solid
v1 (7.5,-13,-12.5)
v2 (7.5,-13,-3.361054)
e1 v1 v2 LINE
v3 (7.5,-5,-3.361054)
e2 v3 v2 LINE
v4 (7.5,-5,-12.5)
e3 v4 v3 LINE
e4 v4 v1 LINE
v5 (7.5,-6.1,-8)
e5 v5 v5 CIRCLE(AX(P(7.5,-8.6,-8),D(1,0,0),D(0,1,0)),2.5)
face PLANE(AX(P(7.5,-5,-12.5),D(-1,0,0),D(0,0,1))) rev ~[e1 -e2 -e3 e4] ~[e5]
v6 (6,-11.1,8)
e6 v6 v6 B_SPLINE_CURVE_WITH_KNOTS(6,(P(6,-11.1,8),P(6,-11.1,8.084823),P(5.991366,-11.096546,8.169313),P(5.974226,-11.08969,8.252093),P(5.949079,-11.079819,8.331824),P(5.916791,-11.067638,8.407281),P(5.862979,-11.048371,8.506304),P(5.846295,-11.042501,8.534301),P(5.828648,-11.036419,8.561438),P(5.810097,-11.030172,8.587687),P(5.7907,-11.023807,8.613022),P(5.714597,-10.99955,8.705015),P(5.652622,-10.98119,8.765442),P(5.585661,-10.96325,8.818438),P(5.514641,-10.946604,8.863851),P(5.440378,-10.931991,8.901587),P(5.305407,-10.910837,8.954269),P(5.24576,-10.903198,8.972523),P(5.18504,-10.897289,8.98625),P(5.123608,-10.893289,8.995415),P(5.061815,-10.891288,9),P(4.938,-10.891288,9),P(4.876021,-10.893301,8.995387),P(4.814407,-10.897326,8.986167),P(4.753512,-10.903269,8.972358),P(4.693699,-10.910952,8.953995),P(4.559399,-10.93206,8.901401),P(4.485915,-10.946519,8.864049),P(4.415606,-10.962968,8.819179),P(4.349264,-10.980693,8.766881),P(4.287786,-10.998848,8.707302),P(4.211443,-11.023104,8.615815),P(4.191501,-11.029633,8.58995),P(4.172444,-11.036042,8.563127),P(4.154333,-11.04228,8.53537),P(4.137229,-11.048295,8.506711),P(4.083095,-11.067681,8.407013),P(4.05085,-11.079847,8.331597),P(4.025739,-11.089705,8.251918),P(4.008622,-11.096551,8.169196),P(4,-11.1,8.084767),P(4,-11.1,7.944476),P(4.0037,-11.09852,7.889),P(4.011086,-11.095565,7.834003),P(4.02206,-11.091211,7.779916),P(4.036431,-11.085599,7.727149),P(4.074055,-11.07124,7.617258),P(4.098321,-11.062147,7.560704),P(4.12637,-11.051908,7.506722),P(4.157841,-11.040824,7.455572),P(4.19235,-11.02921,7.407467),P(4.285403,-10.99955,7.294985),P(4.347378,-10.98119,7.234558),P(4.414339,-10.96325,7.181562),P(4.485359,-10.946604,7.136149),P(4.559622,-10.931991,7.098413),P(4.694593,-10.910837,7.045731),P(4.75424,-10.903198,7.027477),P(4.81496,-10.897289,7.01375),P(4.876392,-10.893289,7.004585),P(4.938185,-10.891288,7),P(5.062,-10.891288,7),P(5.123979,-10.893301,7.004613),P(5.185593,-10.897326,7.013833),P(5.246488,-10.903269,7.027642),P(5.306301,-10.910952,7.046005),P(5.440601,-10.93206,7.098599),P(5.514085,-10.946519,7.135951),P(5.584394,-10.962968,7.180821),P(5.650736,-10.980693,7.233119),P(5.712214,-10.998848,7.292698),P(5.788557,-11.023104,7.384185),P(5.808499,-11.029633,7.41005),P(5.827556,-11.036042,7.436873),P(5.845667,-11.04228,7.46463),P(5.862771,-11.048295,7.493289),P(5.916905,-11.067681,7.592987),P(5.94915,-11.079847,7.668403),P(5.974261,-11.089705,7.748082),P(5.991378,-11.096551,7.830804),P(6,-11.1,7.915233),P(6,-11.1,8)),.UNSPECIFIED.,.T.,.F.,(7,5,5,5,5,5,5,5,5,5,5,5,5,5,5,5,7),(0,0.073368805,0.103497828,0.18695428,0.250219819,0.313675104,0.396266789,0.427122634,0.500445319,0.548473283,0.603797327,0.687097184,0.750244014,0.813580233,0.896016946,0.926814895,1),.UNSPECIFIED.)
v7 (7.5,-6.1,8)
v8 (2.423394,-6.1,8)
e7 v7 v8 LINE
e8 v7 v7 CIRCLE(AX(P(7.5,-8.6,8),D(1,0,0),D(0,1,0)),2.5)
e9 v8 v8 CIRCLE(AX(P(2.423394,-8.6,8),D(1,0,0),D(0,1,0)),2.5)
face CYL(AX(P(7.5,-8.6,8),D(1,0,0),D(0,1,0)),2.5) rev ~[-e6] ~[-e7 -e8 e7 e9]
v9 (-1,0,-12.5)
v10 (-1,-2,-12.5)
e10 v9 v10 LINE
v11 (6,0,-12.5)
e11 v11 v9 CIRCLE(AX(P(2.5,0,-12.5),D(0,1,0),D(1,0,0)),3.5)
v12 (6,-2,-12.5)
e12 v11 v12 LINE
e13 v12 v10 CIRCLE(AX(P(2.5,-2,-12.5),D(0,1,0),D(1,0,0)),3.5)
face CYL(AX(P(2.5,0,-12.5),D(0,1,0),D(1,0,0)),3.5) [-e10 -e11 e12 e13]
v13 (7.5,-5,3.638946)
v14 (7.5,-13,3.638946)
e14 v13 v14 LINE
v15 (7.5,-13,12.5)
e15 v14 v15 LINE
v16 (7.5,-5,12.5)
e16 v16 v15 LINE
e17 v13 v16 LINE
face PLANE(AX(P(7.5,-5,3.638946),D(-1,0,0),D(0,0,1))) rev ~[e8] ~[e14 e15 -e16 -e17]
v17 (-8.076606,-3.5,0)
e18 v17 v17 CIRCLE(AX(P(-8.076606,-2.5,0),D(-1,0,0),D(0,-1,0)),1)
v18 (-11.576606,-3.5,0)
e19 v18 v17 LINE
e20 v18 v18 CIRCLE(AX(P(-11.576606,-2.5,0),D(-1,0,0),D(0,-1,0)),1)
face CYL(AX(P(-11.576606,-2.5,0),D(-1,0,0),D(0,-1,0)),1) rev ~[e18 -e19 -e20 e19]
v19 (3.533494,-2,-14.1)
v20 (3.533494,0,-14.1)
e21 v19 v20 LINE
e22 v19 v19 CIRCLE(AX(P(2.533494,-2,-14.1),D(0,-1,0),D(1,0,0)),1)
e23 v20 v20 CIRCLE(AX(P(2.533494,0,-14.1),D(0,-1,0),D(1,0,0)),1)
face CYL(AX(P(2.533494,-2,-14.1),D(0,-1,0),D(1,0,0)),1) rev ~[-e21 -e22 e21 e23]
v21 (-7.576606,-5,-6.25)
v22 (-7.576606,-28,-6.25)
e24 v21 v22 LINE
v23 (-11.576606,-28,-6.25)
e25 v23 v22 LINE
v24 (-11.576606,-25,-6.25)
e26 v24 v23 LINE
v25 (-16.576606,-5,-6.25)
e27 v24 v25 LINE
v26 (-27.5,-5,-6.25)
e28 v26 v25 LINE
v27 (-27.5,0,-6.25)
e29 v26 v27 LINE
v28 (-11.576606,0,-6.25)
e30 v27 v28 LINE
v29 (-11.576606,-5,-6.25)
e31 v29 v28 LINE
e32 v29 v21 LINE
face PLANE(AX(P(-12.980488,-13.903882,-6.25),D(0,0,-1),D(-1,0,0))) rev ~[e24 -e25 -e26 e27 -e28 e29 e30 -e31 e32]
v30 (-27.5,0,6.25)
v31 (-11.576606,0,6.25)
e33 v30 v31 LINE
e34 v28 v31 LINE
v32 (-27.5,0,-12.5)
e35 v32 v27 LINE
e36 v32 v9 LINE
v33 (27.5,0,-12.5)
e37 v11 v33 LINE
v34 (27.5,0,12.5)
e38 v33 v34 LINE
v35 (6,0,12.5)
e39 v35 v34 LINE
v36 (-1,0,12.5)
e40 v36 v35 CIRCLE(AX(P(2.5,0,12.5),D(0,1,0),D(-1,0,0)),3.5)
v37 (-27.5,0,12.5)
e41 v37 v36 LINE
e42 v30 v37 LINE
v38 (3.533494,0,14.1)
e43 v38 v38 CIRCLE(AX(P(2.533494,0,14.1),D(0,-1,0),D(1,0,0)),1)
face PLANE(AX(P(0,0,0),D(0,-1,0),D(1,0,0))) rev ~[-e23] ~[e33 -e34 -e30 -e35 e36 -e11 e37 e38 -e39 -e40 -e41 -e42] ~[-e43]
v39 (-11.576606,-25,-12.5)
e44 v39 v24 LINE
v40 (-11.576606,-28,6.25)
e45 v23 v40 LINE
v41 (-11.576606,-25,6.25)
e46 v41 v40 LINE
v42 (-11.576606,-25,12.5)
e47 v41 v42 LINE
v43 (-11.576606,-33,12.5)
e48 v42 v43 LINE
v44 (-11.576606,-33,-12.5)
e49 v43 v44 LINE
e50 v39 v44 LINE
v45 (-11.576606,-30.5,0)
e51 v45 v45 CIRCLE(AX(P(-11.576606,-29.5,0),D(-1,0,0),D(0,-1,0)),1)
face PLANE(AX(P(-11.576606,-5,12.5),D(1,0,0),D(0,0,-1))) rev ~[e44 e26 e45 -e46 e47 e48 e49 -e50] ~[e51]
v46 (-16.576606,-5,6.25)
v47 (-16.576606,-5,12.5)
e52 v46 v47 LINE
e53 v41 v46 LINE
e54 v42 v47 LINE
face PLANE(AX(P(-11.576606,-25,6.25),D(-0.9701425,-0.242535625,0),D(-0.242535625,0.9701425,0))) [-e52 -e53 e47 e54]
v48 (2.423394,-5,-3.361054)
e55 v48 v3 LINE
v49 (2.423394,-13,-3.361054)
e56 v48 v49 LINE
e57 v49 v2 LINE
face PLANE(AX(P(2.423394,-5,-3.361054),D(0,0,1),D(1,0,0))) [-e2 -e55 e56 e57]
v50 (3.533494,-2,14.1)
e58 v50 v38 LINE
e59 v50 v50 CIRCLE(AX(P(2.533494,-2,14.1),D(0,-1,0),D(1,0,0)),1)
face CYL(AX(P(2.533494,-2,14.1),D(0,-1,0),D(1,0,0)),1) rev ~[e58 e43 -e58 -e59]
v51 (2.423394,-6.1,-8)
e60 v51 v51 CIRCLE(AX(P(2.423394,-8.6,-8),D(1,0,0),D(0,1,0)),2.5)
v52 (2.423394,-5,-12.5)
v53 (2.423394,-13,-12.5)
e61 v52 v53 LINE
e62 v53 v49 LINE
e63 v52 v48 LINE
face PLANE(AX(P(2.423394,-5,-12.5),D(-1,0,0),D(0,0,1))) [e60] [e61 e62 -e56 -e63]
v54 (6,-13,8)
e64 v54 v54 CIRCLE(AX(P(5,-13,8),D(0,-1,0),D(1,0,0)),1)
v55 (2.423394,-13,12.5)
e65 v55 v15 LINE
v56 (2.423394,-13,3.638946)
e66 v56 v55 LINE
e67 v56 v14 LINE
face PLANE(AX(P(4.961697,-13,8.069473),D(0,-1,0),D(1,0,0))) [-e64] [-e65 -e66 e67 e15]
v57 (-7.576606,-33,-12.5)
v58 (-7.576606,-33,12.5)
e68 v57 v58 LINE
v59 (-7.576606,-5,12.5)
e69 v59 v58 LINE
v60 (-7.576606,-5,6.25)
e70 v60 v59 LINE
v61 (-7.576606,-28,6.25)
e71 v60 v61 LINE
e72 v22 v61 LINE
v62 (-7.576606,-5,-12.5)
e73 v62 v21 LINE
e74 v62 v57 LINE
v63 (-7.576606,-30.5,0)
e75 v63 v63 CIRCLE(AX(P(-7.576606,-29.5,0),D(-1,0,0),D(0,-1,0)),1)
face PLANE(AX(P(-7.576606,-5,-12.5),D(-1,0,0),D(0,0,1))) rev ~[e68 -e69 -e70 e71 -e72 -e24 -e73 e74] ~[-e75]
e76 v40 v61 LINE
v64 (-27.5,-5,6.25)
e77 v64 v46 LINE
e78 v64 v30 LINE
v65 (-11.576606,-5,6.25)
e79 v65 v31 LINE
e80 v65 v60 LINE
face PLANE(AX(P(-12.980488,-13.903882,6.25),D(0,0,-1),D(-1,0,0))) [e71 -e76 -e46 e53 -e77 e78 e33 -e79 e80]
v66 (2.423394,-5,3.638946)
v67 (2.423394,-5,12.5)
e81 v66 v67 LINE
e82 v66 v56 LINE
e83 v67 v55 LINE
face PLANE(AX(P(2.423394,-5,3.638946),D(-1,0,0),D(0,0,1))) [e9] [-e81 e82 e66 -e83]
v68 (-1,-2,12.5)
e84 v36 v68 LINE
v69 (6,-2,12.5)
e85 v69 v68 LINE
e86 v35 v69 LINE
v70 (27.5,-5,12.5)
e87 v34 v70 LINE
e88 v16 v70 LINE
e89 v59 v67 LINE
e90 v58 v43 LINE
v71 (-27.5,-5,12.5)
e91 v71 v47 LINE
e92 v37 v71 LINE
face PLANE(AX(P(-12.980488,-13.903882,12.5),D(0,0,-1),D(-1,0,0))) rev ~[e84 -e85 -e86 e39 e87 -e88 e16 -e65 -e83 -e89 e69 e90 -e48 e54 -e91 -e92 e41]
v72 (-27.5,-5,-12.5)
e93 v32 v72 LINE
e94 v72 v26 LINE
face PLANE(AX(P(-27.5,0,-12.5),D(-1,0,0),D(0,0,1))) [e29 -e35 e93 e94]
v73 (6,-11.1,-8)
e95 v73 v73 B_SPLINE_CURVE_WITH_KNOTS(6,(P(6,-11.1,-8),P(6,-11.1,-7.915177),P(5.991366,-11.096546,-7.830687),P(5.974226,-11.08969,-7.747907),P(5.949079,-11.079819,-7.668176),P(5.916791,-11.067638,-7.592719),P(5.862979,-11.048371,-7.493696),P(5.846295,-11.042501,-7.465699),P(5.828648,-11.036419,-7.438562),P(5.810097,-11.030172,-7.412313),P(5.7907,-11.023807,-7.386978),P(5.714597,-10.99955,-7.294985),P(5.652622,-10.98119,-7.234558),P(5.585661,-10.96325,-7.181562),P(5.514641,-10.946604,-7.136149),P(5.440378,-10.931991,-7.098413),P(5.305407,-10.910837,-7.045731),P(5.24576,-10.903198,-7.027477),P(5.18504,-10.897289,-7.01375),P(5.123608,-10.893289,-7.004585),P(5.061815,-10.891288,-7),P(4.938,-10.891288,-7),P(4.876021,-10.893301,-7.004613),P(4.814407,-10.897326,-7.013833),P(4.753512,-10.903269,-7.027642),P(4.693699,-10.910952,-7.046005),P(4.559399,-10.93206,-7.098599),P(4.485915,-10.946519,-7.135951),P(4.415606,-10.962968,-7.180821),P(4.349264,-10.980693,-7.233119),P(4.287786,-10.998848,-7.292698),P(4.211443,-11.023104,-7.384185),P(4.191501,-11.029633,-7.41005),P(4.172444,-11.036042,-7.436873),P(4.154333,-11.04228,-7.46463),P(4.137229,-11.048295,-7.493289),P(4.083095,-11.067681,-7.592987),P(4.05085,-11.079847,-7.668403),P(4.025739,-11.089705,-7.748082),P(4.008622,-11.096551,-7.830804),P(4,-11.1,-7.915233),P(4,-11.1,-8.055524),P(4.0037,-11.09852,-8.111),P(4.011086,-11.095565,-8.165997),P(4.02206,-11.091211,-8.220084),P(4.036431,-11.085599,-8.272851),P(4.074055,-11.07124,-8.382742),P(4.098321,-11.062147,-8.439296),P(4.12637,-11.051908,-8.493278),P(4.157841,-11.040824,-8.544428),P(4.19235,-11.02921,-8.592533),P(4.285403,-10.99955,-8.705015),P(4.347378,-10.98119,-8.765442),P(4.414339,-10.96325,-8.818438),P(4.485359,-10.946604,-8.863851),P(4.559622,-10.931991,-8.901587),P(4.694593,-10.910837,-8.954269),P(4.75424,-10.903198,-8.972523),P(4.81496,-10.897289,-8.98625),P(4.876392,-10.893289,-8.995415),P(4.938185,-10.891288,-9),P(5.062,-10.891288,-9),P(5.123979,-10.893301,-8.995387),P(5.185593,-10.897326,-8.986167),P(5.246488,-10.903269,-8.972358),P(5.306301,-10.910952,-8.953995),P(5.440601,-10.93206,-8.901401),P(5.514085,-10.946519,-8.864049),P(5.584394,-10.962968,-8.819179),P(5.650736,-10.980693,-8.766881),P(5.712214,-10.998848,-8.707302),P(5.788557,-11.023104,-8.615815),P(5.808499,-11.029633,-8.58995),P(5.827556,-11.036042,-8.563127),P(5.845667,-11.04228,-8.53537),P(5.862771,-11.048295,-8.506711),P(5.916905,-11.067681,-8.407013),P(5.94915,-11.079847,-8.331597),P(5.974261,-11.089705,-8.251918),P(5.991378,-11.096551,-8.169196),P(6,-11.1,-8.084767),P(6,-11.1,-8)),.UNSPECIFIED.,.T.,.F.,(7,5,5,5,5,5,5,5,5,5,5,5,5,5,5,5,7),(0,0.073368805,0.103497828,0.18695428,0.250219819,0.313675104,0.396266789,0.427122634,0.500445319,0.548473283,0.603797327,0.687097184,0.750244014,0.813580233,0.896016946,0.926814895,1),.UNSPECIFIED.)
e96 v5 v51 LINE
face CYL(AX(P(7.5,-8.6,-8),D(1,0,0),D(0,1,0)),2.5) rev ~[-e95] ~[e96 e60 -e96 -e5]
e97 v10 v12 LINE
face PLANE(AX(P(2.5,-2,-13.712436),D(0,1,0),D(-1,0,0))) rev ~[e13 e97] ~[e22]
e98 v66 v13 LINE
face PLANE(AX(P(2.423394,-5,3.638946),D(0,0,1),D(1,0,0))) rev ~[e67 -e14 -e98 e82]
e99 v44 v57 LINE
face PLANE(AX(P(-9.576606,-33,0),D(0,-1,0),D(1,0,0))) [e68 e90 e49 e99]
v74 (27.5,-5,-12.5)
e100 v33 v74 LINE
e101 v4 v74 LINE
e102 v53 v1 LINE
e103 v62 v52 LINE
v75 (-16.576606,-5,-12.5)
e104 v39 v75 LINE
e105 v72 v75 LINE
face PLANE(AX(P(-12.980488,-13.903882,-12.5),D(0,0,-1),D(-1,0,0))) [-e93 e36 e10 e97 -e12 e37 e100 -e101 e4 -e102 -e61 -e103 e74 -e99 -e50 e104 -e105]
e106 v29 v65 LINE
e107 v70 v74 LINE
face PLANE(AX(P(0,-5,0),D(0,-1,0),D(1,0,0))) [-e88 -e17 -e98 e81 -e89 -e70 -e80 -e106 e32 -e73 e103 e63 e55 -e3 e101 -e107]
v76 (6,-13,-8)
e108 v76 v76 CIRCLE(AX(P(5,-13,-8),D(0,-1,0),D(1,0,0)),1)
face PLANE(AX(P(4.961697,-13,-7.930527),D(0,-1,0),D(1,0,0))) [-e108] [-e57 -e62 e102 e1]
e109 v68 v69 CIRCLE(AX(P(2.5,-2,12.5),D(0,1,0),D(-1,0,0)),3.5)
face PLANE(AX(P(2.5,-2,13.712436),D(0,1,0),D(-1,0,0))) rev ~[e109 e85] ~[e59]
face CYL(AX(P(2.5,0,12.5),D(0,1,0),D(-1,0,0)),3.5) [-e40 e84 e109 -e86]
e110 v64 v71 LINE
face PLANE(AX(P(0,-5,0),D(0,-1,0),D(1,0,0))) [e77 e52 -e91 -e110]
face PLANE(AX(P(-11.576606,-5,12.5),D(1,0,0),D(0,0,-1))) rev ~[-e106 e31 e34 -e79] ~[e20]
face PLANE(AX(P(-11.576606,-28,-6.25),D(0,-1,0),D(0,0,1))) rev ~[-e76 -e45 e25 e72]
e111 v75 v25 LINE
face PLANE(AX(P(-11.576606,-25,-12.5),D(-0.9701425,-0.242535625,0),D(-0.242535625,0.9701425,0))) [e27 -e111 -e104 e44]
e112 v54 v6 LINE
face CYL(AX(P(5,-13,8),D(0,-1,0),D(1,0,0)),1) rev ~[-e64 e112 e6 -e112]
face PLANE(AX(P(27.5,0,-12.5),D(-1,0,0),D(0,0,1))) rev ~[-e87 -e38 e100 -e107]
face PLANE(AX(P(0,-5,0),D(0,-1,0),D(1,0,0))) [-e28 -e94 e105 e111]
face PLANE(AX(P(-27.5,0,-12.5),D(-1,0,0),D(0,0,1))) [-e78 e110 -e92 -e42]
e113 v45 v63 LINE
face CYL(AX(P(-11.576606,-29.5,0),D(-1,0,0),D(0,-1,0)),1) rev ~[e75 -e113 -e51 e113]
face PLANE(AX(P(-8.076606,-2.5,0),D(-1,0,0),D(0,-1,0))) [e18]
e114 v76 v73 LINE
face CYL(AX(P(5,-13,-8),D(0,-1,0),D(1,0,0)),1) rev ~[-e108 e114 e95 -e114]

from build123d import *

# Parameters (mm, degrees)
F0_W          = 55
F0_H          = 25
F1_DEPTH      = 5
F2_W          = 15.9233940393
F2_H          = 12.5
F3_DEPTH      = 5.001
F4_R          = 1
F5_DEPTH      = 3.5
F7_DEPTH      = 28
F8_W          = 23
F8_H          = 12.5
F9_DEPTH      = 39.0776059607
F10_R         = 1
F11_DEPTH     = 39.0776059607
F12_W         = 5.0766059607
F12_H         = 8.8610539977
F12_H_2       = 9.1389460023
F13_DEPTH     = 8
F14_R         = 2.5
F15_DEPTH     = 10
F16_T1_DEPTH  = 6.25
F16_T3_DEPTH  = 6.25
F16_T8_DEPTH  = 58.1925499954
F16_T14_DEPTH = 58.1925499954
F17_R         = 1
F18_DEPTH     = 3
F20_DEPTH     = 2
F21_R         = 1
F22_DEPTH     = 2.001


# Not quite as in the source:
# - a fillet or chamfer that OpenCascade refuses, or shapes differently, is made with other operations: its cross-section is extruded or revolved along the edge and cut away or added


with BuildPart() as f1:
    # F0 (on Front) → F1 (new body)
    with BuildSketch(Plane.XZ):
        Rectangle(F0_W, F0_H)
    extrude(amount=F1_DEPTH)

    # F2 (on face) → F3 (cut, through all)
    with BuildSketch(Plane.XZ.offset(5)):
        with Locations((-19.5383029804, 0)):
            Rectangle(F2_W, F2_H)
    extrude(amount=-F3_DEPTH, mode=Mode.SUBTRACT)

    # F4 (on face) → F5 (cut)
    with BuildSketch(Plane(origin=(-11.5766059607, 0, 0), x_dir=(0, -1, 0), z_dir=(-1, 0, 0))):
        with Locations((2.5, 0)):
            Circle(F4_R)
    extrude(amount=-F5_DEPTH, mode=Mode.SUBTRACT)

    # F6 (on face) → F7 (join)
    with BuildSketch(Plane.XZ.offset(5)):
        Polygon((-7.5766059607, 12.5), (-11.5766059607, 12.5), (-11.5766059607, 6.25), (-11.5766059607, -6.25), (-11.5766059607, -12.5), (-7.5766059607, -12.5), align=None)
    extrude(amount=F7_DEPTH)

    # F8 (on face) → F9 (cut, through all)
    with BuildSketch(Plane(origin=(-11.5766059607, 0, 0), x_dir=(0, -1, 0), z_dir=(-1, 0, 0))):
        with Locations((16.5, 0)):
            Rectangle(F8_W, F8_H)
    extrude(amount=-F9_DEPTH, mode=Mode.SUBTRACT)

    # F10 (on face) → F11 (cut, through all)
    with BuildSketch(Plane(origin=(-11.5766059607, 0, 0), x_dir=(0, -1, 0), z_dir=(-1, 0, 0))):
        with Locations((29.5, 0)):
            Circle(F10_R)
    extrude(amount=-F11_DEPTH, mode=Mode.SUBTRACT)

    # F12 (on face) → F13 (join)
    with BuildSketch(Plane.XZ.offset(5)):
        with Locations((4.9616970196, 8.0694730012)):
            Rectangle(F12_W, F12_H)
        with Locations((4.9616970196, -7.9305269988)):
            Rectangle(F12_W, F12_H_2)
    extrude(amount=F13_DEPTH)

    # F14 (on face) → F15 (cut)
    with BuildSketch(Plane.YZ.offset(7.5)):
        with Locations((-8.6, 8)):
            Circle(F14_R)
        with Locations((-8.6, -8)):
            Circle(F14_R)
    extrude(amount=-F15_DEPTH, mode=Mode.SUBTRACT)

    # F16: chamfer of 20 x 5 on 2 edges, made by hand

    # F16_s2 → F16_t1 (join)
    with BuildSketch(Plane.XY.offset(6.25)):
        Polygon((-11.5766059607, -25), (-16.5766059607, -5), (-11.5766059607, -5), align=None)
    extrude(amount=F16_T1_DEPTH)

    # F16_s4 → F16_t3 (join)
    with BuildSketch(Plane.XY.offset(-12.5)):
        Polygon((-11.5766059607, -25), (-16.5766059607, -5), (-11.5766059607, -5), align=None)
    extrude(amount=F16_T3_DEPTH)


with BuildPart() as f16_tool6:
    # F16_s7 → F16_t8 (new body)
    with BuildSketch(Plane.XY.offset(12.5)):
        Polygon((-11.5766059607, -25), (-16.5766059607, -5), (-11.5766059607, -5), align=None)
    extrude(amount=-F16_T8_DEPTH)

    split(bisect_by=Plane.XY.offset(-6.25), keep=Keep.BOTTOM)

    split(bisect_by=Plane.XY.offset(-12.5), keep=Keep.TOP)


with BuildPart() as f1_1:
    add(f1.part)

    # F16_t5: union F16_tool6
    add(f16_tool6.part)


with BuildPart() as f16_tool12:
    # F16_s13 → F16_t14 (new body)
    with BuildSketch(Plane.XY.offset(45.6925499954)):
        Polygon((-11.5766059607, -25), (-16.5766059607, -5), (-11.5766059607, -5), align=None)
    extrude(amount=-F16_T14_DEPTH)

    split(bisect_by=Plane.XY.offset(12.5), keep=Keep.BOTTOM)

    split(bisect_by=Plane.XY.offset(6.25), keep=Keep.TOP)


with BuildPart() as f1_2:
    add(f1_1.part)

    # F16_t11: union F16_tool12
    add(f16_tool12.part)

    # F17 (on face) → F18 (cut)
    with BuildSketch(Plane.XZ.offset(13)):
        with Locations((5, 8)):
            Circle(F17_R)
        with Locations((5, -8)):
            Circle(F17_R)
    extrude(amount=-F18_DEPTH, mode=Mode.SUBTRACT)

    # F19 (on face) → F20 (join)
    with BuildSketch(Plane(origin=(0, 0, 0), x_dir=(-1, 0, 0), z_dir=(0, 1, 0))):
        with BuildLine():
            Line((1, -12.5), (-6, -12.5))
            ThreePointArc((-6, -12.5), (-2.5, -16), (1, -12.5))
        make_face()
        with BuildLine():
            Line((-6, 12.5), (1, 12.5))
            ThreePointArc((1, 12.5), (-2.5, 16), (-6, 12.5))
        make_face()
    extrude(amount=-F20_DEPTH)

    # F21 (on face) → F22 (cut, through all)
    with BuildSketch(Plane.XZ.offset(2)):
        with Locations((2.5334937964, 14.1)):
            Circle(F21_R)
        with Locations((2.5334937964, -14.1)):
            Circle(F21_R)
    extrude(amount=-F22_DEPTH, mode=Mode.SUBTRACT)


solid = f1_2.part
